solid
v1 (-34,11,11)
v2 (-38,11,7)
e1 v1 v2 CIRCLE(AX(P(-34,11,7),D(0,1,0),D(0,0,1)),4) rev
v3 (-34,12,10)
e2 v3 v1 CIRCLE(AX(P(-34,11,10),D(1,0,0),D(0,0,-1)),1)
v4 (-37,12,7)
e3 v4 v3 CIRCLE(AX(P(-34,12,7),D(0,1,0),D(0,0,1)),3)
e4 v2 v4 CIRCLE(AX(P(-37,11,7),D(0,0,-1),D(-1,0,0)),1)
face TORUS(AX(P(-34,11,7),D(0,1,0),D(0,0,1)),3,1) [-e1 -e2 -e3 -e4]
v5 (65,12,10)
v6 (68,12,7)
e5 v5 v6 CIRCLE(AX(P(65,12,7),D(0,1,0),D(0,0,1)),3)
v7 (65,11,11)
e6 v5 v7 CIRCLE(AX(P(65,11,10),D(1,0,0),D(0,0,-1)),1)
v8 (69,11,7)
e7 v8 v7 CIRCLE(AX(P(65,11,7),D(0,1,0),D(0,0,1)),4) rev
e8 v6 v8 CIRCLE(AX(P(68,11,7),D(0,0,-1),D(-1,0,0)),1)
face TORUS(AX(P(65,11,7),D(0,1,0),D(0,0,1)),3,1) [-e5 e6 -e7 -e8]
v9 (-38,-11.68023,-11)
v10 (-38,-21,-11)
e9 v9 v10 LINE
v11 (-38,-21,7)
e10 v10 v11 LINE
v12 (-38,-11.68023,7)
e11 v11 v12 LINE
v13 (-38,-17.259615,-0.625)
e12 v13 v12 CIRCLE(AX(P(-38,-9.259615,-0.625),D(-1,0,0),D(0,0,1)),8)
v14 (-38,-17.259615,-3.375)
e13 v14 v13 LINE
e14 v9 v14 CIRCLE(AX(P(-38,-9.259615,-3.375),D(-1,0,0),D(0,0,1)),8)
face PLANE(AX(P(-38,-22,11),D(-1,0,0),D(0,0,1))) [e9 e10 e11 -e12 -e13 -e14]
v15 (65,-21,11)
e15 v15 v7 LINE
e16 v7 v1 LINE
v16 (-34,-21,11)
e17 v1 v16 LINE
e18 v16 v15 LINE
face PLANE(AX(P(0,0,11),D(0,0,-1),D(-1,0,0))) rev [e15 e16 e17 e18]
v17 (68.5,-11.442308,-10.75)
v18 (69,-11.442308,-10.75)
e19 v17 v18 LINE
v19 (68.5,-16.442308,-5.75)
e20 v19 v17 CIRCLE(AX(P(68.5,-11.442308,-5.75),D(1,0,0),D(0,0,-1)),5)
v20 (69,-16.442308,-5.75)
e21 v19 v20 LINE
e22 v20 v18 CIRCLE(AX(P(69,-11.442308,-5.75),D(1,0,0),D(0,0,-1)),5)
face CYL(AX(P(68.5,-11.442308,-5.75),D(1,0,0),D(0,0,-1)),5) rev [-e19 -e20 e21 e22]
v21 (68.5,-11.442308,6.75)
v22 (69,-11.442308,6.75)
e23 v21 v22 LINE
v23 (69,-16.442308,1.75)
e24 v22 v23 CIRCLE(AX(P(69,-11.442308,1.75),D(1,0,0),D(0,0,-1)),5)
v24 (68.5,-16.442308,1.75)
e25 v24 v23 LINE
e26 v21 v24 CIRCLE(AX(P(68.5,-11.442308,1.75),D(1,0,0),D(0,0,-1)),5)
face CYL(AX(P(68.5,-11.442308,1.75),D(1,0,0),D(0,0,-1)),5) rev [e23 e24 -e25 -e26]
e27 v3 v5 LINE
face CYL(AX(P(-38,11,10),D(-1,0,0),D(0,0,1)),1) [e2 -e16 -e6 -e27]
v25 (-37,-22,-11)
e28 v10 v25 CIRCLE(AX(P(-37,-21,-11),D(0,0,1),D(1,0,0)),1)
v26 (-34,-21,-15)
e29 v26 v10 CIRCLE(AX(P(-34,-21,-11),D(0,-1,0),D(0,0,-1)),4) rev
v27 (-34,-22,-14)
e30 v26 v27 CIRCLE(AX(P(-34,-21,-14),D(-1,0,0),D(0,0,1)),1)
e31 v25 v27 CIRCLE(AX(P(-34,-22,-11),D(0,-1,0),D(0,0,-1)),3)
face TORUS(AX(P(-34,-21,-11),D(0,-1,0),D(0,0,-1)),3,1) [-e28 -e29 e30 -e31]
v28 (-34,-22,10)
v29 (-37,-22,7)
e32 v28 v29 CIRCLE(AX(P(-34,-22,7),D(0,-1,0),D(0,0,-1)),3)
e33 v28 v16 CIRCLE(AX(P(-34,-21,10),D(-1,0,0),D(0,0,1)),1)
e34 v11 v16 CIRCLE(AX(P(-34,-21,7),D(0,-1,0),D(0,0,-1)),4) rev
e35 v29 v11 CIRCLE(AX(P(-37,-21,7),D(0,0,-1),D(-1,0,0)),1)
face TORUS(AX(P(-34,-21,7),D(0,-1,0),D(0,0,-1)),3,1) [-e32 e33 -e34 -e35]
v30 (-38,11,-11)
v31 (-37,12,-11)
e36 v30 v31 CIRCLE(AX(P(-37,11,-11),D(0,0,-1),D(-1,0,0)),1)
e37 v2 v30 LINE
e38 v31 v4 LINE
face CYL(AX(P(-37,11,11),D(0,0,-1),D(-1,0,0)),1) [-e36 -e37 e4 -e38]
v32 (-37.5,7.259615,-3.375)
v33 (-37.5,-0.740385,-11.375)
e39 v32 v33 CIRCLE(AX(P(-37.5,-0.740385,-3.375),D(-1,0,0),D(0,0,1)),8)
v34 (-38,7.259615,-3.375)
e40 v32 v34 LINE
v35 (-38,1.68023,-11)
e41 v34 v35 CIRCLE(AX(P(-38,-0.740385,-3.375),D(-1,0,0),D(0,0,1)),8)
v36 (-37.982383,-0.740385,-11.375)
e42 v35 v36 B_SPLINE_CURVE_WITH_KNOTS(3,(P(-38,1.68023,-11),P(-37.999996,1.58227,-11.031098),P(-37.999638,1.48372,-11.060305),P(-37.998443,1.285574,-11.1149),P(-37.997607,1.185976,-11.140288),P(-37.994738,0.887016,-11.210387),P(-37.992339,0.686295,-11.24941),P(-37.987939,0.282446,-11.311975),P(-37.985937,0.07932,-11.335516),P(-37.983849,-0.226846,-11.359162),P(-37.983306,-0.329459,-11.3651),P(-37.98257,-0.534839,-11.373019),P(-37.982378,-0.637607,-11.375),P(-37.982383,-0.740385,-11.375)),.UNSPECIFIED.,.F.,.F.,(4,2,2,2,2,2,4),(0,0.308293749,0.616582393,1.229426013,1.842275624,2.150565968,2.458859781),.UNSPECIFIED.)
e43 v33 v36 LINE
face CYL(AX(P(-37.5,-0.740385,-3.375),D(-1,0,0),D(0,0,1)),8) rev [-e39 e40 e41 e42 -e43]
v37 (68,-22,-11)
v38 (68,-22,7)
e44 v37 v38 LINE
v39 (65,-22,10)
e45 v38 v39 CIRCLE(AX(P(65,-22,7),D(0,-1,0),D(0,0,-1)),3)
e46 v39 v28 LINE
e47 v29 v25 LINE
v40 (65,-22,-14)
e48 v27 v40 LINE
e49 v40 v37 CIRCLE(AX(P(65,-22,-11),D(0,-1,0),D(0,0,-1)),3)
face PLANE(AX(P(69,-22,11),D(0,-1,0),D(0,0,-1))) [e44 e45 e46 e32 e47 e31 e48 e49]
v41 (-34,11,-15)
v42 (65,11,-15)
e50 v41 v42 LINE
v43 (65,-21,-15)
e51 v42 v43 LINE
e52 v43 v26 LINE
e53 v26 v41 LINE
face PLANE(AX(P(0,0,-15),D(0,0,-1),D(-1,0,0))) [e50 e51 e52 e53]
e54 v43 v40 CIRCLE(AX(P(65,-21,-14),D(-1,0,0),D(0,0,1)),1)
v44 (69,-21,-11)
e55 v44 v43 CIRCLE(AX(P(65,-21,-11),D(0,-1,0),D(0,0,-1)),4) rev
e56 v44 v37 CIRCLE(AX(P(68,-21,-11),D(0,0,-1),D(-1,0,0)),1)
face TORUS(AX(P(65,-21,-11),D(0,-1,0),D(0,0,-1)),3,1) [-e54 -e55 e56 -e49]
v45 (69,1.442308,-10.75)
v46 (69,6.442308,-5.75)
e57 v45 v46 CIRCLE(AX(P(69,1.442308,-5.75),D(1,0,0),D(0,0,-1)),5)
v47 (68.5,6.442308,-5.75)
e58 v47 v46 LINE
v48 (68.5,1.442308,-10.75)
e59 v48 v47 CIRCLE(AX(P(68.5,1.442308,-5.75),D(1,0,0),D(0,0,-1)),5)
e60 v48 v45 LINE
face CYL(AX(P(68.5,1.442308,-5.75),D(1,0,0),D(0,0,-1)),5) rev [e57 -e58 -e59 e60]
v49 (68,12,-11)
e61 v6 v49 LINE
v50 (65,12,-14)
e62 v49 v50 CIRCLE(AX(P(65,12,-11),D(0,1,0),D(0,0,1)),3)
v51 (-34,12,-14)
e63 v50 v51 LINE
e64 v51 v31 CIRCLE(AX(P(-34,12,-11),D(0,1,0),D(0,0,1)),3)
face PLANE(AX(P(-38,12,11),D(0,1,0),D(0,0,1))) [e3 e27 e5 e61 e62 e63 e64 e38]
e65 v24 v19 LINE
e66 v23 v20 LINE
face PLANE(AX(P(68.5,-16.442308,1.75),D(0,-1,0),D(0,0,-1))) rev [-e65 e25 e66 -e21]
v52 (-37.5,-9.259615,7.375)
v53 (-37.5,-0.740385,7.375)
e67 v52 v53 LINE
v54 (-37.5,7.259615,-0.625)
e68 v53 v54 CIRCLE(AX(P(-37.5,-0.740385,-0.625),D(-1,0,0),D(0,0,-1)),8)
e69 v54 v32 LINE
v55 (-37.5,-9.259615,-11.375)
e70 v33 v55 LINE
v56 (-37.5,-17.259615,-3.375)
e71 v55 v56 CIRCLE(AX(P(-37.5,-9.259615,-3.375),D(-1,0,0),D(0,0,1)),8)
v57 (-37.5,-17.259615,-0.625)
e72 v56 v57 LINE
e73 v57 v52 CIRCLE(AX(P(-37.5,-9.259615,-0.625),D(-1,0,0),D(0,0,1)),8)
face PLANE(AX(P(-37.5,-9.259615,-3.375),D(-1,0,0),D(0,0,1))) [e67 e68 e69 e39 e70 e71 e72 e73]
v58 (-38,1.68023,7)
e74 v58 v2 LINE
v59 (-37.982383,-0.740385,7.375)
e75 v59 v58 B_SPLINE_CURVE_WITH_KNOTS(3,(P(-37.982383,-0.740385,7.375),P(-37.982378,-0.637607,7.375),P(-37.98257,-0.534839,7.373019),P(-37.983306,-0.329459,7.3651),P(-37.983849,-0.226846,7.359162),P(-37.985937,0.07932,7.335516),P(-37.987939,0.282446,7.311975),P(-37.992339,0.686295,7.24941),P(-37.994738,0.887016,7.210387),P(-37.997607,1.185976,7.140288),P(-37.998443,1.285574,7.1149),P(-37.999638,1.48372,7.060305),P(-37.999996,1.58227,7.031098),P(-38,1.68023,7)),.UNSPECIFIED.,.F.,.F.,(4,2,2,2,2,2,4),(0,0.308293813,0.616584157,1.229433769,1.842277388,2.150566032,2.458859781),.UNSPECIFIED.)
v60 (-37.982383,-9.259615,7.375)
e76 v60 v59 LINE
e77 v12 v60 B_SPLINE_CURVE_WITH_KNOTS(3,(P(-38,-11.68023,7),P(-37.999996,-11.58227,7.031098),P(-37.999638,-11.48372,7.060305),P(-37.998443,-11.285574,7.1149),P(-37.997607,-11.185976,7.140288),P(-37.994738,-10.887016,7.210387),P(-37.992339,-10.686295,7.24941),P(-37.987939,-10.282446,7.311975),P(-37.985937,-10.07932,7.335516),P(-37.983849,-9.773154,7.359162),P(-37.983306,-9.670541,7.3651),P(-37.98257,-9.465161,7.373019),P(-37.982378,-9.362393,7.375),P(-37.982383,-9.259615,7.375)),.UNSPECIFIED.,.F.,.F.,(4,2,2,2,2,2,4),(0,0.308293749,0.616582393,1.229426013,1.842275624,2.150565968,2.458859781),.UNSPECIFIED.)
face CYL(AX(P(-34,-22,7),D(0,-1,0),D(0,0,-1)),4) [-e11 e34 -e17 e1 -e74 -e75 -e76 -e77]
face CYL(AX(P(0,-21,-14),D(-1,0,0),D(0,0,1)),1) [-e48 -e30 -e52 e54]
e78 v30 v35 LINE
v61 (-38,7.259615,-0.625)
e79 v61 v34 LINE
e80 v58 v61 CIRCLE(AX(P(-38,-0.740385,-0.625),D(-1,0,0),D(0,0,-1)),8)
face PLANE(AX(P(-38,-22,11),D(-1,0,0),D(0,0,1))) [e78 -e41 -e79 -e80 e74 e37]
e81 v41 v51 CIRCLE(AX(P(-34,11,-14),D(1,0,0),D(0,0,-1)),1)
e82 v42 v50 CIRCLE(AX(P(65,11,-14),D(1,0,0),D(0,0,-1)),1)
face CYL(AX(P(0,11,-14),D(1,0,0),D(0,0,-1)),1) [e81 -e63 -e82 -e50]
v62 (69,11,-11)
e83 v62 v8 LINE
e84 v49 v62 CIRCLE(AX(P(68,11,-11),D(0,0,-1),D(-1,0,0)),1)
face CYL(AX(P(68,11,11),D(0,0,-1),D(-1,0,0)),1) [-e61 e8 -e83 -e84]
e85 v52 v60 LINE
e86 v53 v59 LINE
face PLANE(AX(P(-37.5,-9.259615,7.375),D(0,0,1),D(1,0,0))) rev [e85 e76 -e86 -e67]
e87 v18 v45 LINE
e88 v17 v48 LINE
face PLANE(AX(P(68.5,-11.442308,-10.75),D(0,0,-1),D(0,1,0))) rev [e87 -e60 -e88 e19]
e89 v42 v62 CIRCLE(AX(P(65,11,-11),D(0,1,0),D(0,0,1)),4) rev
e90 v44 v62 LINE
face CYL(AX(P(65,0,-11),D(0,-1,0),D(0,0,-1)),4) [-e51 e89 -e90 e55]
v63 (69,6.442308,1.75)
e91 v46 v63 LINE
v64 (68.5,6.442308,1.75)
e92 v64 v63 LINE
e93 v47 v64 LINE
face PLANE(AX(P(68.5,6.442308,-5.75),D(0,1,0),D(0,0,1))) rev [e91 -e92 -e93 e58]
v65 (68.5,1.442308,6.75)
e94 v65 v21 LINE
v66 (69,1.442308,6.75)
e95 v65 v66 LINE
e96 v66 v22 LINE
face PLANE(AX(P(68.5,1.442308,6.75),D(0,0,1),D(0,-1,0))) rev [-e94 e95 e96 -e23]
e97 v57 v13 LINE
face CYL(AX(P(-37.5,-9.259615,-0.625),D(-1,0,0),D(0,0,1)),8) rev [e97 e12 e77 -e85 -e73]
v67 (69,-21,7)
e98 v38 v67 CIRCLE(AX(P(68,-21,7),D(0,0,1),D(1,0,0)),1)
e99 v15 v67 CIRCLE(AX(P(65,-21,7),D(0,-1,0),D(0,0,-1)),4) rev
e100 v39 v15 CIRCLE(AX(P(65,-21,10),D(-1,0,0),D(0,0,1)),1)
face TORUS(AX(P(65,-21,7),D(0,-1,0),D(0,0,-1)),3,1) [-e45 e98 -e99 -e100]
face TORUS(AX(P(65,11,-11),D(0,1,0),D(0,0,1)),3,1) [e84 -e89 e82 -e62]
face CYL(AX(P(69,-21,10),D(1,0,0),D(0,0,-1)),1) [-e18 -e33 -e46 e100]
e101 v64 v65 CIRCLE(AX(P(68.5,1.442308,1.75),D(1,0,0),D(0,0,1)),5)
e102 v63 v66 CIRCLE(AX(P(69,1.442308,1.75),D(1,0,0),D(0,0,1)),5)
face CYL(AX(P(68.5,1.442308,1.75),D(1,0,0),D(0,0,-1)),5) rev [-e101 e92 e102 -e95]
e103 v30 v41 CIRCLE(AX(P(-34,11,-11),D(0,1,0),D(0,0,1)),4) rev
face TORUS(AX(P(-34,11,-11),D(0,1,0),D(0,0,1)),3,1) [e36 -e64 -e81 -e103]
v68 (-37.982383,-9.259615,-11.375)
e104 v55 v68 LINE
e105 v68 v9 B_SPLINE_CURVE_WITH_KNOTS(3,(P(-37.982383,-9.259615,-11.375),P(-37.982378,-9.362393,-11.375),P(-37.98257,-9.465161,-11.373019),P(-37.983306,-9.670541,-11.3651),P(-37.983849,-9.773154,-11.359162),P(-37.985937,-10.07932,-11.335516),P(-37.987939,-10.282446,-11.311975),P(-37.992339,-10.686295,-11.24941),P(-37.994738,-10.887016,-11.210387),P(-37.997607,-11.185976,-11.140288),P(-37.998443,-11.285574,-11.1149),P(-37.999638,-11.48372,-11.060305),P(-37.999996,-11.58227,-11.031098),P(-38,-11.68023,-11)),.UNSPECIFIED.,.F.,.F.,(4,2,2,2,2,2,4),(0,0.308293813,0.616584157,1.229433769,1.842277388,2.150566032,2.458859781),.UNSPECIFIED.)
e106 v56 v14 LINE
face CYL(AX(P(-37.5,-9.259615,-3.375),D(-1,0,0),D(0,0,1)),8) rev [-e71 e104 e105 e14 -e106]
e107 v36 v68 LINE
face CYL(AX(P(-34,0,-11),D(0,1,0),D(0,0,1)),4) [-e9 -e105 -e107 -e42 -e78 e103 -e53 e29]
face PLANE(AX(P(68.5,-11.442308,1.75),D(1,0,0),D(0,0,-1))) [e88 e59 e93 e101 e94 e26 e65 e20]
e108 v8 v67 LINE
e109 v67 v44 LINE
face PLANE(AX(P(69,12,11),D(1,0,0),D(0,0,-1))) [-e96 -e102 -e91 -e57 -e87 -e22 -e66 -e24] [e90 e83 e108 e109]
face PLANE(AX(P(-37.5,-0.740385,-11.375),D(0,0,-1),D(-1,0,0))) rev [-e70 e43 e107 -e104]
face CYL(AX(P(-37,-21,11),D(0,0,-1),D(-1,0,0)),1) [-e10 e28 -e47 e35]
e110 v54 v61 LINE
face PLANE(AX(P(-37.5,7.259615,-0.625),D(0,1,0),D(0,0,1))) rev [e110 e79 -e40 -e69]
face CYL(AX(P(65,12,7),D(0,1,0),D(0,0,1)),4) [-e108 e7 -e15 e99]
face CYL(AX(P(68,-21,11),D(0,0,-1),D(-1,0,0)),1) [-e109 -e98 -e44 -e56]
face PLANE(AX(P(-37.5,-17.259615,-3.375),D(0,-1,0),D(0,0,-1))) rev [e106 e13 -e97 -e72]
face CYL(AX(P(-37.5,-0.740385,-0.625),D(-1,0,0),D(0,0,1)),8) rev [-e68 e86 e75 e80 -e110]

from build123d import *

# Parameters (mm, degrees)
SKETCH1_W           = 107
SKETCH1_H           = 34
BOSS_EXTRUDE1_DEPTH = 26
CUT_EXTRUDE1_DEPTH  = 0.5
CUT_EXTRUDE2_DEPTH  = 0.5
FILLET1_R           = 4
FILLET2_R           = 1


with BuildPart() as part:
    # Sketch1 → Boss-Extrude1 (new body)
    with BuildSketch(Plane(origin=(0, 0, -15), x_dir=(-1, 0, 0), z_dir=(0, 0, -1))):
        with Locations((-15.5, -5)):
            Rectangle(SKETCH1_W, SKETCH1_H)
    extrude(amount=-BOSS_EXTRUDE1_DEPTH)

    # Sketch2 → Cut-Extrude1 (cut)
    with BuildSketch(Plane(origin=(69, 0, 0), x_dir=(0, 0, -1), z_dir=(1, 0, 0))):
        with BuildLine():
            Line((-6.75, 1.442307692), (-6.75, -11.442307692))
            ThreePointArc((-6.75, -11.442307692), (-5.285533906, -14.977841598), (-1.75, -16.442307692))
            Line((-1.75, -16.442307692), (5.75, -16.442307692))
            ThreePointArc((5.75, -16.442307692), (9.285533906, -14.977841598), (10.75, -11.442307692))
            Line((10.75, -11.442307692), (10.75, 1.442307692))
            ThreePointArc((10.75, 1.442307692), (9.285533906, 4.977841598), (5.75, 6.442307692))
            Line((5.75, 6.442307692), (-1.75, 6.442307692))
            ThreePointArc((-1.75, 6.442307692), (-5.285533906, 4.977841598), (-6.75, 1.442307692))
        make_face()
    extrude(amount=-CUT_EXTRUDE1_DEPTH, mode=Mode.SUBTRACT)

    # Sketch3 → Cut-Extrude2 (cut)
    with BuildSketch(Plane.ZY.offset(38)):
        with BuildLine():
            Line((-0.625, 7.259615385), (-3.375, 7.259615385))
            ThreePointArc((-3.375, 7.259615385), (-9.031854249, 4.916469634), (-11.375, -0.740384615))
            Line((-11.375, -0.740384615), (-11.375, -9.259615385))
            ThreePointArc((-11.375, -9.259615385), (-9.031854249, -14.916469634), (-3.375, -17.259615385))
            Line((-3.375, -17.259615385), (-0.625, -17.259615385))
            ThreePointArc((-0.625, -17.259615385), (5.031854249, -14.916469634), (7.375, -9.259615385))
            Line((7.375, -9.259615385), (7.375, -0.740384615))
            ThreePointArc((7.375, -0.740384615), (5.031854249, 4.916469634), (-0.625, 7.259615385))
        make_face()
    extrude(amount=-CUT_EXTRUDE2_DEPTH, mode=Mode.SUBTRACT)

    # Fillet1
    # the kernel refuses this fillet: 4 mm, written as the material it takes off along each edge
    with BuildSketch(Plane(origin=(-38, -32, -15), x_dir=(0, 0, 1), z_dir=(0, 1, 0)), Plane(origin=(69, 22, -15), x_dir=(0, 0, 1), z_dir=(0, -1, 0))) as fillet1_piece_1:
        with BuildLine():
            CenterArc((FILLET1_R, FILLET1_R), FILLET1_R, 180, 90)
            Line((0, FILLET1_R), (0, 0))
            Line((0, 0), (FILLET1_R, 0))
        make_face()
    extrude(amount=54, mode=Mode.SUBTRACT)
    with BuildSketch(Plane(origin=(-38, -32, 11), x_dir=(0, 0, -1), z_dir=(0, 1, 0)), Plane(origin=(69, 22, 11), x_dir=(0, 0, -1), z_dir=(0, -1, 0))) as fillet1_piece_2:
        with BuildLine():
            CenterArc((FILLET1_R, -FILLET1_R), FILLET1_R, 90, 90)
            Line((0, -FILLET1_R), (0, 0))
            Line((0, 0), (FILLET1_R, 0))
        make_face()
    extrude(amount=54, mode=Mode.SUBTRACT)

    # Fillet2
    fillet2_edges = [part.edges().sort_by_distance(p)[0] for p in [
        (15.5, -22, -15),
        (15.5, 12, -15),
        (-38, 12, -2),
        (15.5, 12, 11),
        (69, 12, -2),
        (67.828427125, 12, 9.828427125),
        (67.828427125, 12, -13.828427125),
        (-36.828427125, 12, 9.828427125),
        (-36.828427125, 12, -13.828427125),
        (-38, -22, -2),
        (69, -22, -2),
        (15.5, -22, 11),
        (67.828427125, -22, 9.828427125),
        (67.828427125, -22, -13.828427125),
        (-36.828427125, -22, 9.828427125),
        (-36.828427125, -22, -13.828427125),
    ]]
    fillet(fillet2_edges, radius=FILLET2_R)


solid = part.part
